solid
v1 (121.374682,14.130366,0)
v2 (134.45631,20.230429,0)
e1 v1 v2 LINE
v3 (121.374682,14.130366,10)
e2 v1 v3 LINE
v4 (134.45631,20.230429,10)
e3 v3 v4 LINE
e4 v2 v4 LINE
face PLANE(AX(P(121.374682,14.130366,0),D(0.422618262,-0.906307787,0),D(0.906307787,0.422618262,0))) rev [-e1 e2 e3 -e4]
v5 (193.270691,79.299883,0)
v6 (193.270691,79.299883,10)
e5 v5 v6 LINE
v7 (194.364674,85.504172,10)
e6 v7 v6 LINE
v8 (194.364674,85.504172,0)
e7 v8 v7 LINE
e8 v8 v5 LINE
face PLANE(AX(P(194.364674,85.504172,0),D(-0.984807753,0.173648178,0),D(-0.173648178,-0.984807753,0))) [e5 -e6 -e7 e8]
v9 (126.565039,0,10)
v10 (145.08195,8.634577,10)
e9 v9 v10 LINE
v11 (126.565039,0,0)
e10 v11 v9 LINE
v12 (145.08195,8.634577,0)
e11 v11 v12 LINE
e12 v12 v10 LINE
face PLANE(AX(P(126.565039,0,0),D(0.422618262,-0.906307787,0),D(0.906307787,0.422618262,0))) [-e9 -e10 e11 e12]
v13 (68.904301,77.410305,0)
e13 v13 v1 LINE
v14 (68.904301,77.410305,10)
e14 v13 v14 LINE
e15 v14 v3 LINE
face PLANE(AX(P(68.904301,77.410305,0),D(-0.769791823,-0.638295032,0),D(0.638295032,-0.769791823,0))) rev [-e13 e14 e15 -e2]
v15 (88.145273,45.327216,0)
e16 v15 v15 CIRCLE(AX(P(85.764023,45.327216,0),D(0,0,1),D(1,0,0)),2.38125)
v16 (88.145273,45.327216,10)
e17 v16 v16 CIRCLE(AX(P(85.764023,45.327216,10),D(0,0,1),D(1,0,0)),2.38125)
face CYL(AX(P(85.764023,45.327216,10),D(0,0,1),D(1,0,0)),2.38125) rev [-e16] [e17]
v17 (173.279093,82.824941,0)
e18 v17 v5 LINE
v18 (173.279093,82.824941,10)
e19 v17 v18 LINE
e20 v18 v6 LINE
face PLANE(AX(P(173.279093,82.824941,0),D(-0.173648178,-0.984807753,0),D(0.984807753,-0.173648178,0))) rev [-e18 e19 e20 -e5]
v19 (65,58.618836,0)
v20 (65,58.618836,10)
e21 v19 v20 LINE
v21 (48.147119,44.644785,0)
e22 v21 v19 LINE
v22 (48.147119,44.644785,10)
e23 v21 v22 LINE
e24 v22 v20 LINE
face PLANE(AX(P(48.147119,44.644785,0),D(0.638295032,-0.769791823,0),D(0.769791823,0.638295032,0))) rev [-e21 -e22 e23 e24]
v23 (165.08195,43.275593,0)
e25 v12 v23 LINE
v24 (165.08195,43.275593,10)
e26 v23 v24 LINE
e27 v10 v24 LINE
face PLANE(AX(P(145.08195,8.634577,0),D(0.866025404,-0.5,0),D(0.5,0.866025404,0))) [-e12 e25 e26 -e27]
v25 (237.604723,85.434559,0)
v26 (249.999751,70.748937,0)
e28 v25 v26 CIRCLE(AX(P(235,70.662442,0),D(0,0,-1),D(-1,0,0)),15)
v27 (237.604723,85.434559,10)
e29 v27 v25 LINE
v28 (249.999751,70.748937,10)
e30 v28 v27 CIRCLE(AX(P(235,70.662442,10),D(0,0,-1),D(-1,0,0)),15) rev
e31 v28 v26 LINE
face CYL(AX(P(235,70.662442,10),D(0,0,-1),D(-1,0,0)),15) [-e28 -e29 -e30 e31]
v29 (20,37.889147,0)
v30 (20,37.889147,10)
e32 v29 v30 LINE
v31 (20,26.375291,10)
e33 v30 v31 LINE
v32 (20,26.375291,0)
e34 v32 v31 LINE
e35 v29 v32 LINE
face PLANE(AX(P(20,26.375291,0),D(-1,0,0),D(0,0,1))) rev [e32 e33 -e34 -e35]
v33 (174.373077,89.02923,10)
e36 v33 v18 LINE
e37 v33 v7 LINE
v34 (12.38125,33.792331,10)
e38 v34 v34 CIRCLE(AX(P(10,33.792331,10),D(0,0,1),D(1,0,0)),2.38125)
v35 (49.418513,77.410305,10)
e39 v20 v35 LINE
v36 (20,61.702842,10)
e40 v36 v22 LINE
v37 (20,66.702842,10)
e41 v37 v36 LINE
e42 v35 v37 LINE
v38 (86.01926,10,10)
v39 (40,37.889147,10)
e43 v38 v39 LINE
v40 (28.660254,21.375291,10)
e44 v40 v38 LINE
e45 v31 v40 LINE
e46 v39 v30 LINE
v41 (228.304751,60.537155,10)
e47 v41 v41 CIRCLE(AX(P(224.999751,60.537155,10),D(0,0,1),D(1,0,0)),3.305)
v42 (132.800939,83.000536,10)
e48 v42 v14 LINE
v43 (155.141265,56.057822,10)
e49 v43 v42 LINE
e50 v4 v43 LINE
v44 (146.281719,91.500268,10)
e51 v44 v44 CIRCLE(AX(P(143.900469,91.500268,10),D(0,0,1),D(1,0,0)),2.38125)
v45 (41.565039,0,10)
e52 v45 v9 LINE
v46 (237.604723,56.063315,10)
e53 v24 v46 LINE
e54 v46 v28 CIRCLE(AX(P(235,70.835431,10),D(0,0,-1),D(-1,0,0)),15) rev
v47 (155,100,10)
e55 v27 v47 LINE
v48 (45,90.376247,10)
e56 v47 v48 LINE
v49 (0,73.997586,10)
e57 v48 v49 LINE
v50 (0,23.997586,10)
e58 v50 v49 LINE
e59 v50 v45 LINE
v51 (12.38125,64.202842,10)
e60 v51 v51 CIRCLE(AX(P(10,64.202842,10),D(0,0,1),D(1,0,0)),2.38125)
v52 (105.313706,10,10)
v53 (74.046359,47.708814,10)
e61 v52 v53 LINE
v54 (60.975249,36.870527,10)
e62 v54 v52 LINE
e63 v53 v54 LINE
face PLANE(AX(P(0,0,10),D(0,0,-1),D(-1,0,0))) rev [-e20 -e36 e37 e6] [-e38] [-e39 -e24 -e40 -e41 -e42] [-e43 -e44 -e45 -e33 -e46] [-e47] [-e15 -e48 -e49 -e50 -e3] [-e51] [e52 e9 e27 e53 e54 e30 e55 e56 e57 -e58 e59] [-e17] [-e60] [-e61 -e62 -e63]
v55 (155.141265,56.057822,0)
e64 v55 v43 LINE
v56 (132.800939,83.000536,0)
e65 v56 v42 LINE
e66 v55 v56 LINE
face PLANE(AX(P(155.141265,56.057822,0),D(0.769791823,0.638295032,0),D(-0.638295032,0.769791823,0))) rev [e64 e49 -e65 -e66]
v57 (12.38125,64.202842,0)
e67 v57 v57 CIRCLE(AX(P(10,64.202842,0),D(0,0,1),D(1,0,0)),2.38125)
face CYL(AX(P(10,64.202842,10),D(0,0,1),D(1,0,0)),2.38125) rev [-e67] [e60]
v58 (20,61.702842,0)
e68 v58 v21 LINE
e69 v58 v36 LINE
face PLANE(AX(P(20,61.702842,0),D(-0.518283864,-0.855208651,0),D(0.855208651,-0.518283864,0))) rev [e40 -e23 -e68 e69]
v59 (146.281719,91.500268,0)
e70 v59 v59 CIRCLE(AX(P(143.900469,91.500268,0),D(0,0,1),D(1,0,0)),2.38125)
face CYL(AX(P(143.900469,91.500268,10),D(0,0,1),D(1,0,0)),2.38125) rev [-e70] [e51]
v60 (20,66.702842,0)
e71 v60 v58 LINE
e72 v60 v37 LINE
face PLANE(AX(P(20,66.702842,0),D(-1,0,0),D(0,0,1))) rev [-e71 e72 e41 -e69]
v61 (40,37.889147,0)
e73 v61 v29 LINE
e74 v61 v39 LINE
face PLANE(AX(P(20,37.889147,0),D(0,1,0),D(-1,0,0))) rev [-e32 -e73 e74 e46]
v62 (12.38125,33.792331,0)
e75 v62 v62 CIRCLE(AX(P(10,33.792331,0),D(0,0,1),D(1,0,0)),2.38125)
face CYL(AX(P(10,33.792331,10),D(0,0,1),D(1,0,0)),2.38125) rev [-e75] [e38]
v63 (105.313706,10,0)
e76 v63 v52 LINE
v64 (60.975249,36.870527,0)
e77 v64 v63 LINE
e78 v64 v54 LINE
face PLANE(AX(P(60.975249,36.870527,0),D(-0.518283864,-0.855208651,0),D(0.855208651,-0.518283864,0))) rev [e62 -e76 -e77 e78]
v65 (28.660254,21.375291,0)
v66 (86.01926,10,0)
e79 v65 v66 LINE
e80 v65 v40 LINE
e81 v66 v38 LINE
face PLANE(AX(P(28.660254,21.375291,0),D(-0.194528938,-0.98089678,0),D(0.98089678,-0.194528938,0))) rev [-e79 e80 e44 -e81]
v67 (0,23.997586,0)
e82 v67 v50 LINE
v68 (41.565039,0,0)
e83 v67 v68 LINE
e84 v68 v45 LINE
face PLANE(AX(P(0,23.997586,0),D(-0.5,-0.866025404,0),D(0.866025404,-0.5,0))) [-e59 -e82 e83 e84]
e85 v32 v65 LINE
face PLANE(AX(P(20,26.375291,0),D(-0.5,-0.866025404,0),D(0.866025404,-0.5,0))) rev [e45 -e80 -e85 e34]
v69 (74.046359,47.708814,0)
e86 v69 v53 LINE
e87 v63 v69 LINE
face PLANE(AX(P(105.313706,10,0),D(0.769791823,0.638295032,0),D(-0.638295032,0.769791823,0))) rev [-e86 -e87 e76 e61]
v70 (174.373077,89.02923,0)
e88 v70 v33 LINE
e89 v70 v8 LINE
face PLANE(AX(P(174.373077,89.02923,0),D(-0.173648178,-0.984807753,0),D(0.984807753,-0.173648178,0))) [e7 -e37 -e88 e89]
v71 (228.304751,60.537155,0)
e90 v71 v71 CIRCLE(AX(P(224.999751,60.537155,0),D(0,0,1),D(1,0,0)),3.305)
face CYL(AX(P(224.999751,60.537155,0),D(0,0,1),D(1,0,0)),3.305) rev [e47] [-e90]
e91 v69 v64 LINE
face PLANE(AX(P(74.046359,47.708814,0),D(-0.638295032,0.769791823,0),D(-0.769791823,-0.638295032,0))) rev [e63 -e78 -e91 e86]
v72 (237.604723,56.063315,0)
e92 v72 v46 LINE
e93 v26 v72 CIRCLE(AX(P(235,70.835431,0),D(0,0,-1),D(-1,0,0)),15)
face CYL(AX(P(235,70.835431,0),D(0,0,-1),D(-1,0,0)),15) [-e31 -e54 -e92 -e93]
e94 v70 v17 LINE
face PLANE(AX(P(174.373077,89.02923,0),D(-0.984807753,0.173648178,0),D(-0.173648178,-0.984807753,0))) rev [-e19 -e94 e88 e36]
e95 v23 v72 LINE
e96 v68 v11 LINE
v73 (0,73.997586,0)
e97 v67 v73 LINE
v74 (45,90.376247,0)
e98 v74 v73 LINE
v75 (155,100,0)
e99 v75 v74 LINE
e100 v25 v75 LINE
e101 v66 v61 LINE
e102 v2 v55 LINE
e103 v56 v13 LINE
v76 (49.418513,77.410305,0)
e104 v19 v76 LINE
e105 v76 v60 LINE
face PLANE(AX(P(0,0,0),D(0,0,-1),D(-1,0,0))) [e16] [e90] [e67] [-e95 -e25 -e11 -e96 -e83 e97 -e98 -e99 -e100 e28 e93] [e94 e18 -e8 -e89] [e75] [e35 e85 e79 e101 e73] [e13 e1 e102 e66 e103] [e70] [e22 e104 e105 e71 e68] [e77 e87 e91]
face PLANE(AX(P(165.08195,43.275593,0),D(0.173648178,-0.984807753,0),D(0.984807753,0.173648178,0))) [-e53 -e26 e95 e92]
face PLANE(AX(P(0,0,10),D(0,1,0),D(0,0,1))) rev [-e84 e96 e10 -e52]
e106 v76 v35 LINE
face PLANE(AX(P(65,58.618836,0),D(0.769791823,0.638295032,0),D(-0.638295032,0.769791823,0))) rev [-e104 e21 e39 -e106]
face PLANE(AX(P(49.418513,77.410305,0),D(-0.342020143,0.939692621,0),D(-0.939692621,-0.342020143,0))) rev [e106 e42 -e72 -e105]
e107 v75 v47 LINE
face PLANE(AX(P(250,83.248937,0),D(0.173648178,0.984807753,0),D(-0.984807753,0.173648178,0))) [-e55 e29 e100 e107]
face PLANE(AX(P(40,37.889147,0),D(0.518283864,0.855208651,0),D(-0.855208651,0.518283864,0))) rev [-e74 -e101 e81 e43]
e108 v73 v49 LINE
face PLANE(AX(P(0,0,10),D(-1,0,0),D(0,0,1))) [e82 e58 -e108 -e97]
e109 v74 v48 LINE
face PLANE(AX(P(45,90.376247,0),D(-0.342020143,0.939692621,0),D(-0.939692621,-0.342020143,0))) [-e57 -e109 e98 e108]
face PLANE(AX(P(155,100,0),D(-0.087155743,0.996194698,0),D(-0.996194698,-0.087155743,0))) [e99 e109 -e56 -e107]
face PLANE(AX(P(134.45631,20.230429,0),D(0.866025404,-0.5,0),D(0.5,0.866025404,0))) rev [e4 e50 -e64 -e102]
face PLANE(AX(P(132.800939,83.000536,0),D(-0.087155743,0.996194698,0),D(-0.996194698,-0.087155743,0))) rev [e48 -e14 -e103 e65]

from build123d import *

# Parameters (mm, degrees)
ESQUISSE1_W                             = 250
ESQUISSE1_H                             = 100
BOSS_EXTRU_1_DEPTH                      = 10
ESQUISSE2_OUTSIDE_W                     = 305.888
ESQUISSE2_OUTSIDE_H                     = 155.888
ENL_V_MAT_EXTRU_1_DEPTH                 = 270.443871706
ENL_V_MAT_EXTRU_2_DEPTH                 = 270.443871706
CONG_1_R                                = 15
ESQUISSE4_R                             = 3.305
ENL_V_MAT_EXTRU_3_DEPTH                 = 270.443640324
PER_AGE_POUR_CROUS_AUTO_BLOQUANTS_300_D = 4.7625
PER_AGE_POUR_CROUS_AUTO_BLOQUANTS_3_2_D = 4.7625
ENL_V_MAT_EXTRU_4_DEPTH                 = 10


with BuildPart() as part:
    # Esquisse1 → Boss.-Extru.1 (new body)
    with BuildSketch(Plane.XY):
        with Locations((125, 50)):
            Rectangle(ESQUISSE1_W, ESQUISSE1_H)
    extrude(amount=BOSS_EXTRU_1_DEPTH)

    # Esquisse2 outside → Enlèv. mat.-Extru.1 (cut, through all)
    with BuildSketch(Plane.XY.offset(10)):
        with Locations((125, 50)):
            Rectangle(ESQUISSE2_OUTSIDE_W, ESQUISSE2_OUTSIDE_H)
        Polygon((250, 83.248936833), (155, 100), (45, 90.376247012), (0, 73.99758647), (0, 23.99758647), (41.565039025, 0), (126.565039025, 0), (145.081949739, 8.634577271), (165.081949739, 43.275593423), (250, 58.248936833), align=None, mode=Mode.SUBTRACT)
    extrude(amount=-ENL_V_MAT_EXTRU_1_DEPTH, mode=Mode.SUBTRACT)

    # Esquisse3 → Enlèv. mat.-Extru.2 (cut, through all)
    with BuildSketch(Plane.XY.offset(10)):
        Polygon((134.456309599, 20.230428685), (155.141265019, 56.057822426), (132.800938883, 83.000536248), (68.90430085, 77.410304783), (121.374682449, 14.130365764), align=None)
        Polygon((105.313706387, 10), (74.046358719, 47.708813875), (60.975248723, 36.870527049), align=None)
        Polygon((20, 26.375291272), (20, 37.889147432), (40, 37.889147432), (86.019260451, 10), (28.660254038, 21.375291272), align=None)
        Polygon((20, 61.702841638), (48.147118965, 44.644785014), (65, 58.618836074), (49.418513209, 77.410304783), (20, 66.702841638), align=None)
    extrude(amount=-ENL_V_MAT_EXTRU_2_DEPTH, mode=Mode.SUBTRACT)

    # Congé1
    # the kernel refuses this fillet: 15 mm, written as the material it takes off along each edge
    with BuildSketch(Plane(origin=(250, 83.248936833, 41.466236169), x_dir=(-0.9848077530122094, 0.17364817766692334, 0), z_dir=(0, 0, -1))) as cong_1_piece_1:
        with BuildLine():
            CenterArc((CONG_1_R * 0.839099631177, -CONG_1_R), CONG_1_R, 90, 80)
            Line((-CONG_1_R * 0.145708121835, -CONG_1_R * 0.826351822333), (0, 0))
            Line((0, 0), (CONG_1_R * 0.839099631177, 0))
        make_face()
    extrude(amount=72.932472338, mode=Mode.SUBTRACT)
    with BuildSketch(Plane(origin=(250, 58.248936833, 41.466236169), x_dir=(-0.984807753012208, -0.17364817766693091, 0), z_dir=(0, 0, -1))) as cong_1_piece_2:
        with BuildLine():
            CenterArc((CONG_1_R * 0.839099631177, CONG_1_R), CONG_1_R, 190, 80)
            Line((-CONG_1_R * 0.145708121835, CONG_1_R * 0.826351822333), (0, 0))
            Line((0, 0), (CONG_1_R * 0.839099631177, 0))
        make_face()
    extrude(amount=72.932472338, mode=Mode.SUBTRACT)

    # Esquisse4 → Enlèv. mat.-Extru.3 (cut, through all)
    with BuildSketch(Plane.XY.offset(10)):
        with Locations((224.999750621, 60.537155323)):
            Circle(ESQUISSE4_R)
    extrude(amount=-ENL_V_MAT_EXTRU_3_DEPTH, mode=Mode.SUBTRACT)

    # Per_age pour _crous auto-bloquants 300 (through all)
    with Locations(Plane.XY.offset(10)):
        with Locations((85.764023291, 45.327215553), (143.900469441, 91.500268124)):
            Hole(PER_AGE_POUR_CROUS_AUTO_BLOQUANTS_300_D / 2)

    # Per_age pour _crous auto-bloquants 3 2 (through all)
    with Locations(Plane.XY.offset(10)):
        with Locations((10, 64.202841638), (10, 33.792331302)):
            Hole(PER_AGE_POUR_CROUS_AUTO_BLOQUANTS_3_2_D / 2)

    # Esquisse10 → Enlèv. mat.-Extru.4 (cut)
    with BuildSketch(Plane.XY.offset(10)):
        Polygon((174.373076709, 89.029229885), (173.279093189, 82.824941041), (193.270690575, 79.299883034), (194.364674095, 85.504171878), align=None)
    extrude(amount=-ENL_V_MAT_EXTRU_4_DEPTH, mode=Mode.SUBTRACT)


solid = part.part
